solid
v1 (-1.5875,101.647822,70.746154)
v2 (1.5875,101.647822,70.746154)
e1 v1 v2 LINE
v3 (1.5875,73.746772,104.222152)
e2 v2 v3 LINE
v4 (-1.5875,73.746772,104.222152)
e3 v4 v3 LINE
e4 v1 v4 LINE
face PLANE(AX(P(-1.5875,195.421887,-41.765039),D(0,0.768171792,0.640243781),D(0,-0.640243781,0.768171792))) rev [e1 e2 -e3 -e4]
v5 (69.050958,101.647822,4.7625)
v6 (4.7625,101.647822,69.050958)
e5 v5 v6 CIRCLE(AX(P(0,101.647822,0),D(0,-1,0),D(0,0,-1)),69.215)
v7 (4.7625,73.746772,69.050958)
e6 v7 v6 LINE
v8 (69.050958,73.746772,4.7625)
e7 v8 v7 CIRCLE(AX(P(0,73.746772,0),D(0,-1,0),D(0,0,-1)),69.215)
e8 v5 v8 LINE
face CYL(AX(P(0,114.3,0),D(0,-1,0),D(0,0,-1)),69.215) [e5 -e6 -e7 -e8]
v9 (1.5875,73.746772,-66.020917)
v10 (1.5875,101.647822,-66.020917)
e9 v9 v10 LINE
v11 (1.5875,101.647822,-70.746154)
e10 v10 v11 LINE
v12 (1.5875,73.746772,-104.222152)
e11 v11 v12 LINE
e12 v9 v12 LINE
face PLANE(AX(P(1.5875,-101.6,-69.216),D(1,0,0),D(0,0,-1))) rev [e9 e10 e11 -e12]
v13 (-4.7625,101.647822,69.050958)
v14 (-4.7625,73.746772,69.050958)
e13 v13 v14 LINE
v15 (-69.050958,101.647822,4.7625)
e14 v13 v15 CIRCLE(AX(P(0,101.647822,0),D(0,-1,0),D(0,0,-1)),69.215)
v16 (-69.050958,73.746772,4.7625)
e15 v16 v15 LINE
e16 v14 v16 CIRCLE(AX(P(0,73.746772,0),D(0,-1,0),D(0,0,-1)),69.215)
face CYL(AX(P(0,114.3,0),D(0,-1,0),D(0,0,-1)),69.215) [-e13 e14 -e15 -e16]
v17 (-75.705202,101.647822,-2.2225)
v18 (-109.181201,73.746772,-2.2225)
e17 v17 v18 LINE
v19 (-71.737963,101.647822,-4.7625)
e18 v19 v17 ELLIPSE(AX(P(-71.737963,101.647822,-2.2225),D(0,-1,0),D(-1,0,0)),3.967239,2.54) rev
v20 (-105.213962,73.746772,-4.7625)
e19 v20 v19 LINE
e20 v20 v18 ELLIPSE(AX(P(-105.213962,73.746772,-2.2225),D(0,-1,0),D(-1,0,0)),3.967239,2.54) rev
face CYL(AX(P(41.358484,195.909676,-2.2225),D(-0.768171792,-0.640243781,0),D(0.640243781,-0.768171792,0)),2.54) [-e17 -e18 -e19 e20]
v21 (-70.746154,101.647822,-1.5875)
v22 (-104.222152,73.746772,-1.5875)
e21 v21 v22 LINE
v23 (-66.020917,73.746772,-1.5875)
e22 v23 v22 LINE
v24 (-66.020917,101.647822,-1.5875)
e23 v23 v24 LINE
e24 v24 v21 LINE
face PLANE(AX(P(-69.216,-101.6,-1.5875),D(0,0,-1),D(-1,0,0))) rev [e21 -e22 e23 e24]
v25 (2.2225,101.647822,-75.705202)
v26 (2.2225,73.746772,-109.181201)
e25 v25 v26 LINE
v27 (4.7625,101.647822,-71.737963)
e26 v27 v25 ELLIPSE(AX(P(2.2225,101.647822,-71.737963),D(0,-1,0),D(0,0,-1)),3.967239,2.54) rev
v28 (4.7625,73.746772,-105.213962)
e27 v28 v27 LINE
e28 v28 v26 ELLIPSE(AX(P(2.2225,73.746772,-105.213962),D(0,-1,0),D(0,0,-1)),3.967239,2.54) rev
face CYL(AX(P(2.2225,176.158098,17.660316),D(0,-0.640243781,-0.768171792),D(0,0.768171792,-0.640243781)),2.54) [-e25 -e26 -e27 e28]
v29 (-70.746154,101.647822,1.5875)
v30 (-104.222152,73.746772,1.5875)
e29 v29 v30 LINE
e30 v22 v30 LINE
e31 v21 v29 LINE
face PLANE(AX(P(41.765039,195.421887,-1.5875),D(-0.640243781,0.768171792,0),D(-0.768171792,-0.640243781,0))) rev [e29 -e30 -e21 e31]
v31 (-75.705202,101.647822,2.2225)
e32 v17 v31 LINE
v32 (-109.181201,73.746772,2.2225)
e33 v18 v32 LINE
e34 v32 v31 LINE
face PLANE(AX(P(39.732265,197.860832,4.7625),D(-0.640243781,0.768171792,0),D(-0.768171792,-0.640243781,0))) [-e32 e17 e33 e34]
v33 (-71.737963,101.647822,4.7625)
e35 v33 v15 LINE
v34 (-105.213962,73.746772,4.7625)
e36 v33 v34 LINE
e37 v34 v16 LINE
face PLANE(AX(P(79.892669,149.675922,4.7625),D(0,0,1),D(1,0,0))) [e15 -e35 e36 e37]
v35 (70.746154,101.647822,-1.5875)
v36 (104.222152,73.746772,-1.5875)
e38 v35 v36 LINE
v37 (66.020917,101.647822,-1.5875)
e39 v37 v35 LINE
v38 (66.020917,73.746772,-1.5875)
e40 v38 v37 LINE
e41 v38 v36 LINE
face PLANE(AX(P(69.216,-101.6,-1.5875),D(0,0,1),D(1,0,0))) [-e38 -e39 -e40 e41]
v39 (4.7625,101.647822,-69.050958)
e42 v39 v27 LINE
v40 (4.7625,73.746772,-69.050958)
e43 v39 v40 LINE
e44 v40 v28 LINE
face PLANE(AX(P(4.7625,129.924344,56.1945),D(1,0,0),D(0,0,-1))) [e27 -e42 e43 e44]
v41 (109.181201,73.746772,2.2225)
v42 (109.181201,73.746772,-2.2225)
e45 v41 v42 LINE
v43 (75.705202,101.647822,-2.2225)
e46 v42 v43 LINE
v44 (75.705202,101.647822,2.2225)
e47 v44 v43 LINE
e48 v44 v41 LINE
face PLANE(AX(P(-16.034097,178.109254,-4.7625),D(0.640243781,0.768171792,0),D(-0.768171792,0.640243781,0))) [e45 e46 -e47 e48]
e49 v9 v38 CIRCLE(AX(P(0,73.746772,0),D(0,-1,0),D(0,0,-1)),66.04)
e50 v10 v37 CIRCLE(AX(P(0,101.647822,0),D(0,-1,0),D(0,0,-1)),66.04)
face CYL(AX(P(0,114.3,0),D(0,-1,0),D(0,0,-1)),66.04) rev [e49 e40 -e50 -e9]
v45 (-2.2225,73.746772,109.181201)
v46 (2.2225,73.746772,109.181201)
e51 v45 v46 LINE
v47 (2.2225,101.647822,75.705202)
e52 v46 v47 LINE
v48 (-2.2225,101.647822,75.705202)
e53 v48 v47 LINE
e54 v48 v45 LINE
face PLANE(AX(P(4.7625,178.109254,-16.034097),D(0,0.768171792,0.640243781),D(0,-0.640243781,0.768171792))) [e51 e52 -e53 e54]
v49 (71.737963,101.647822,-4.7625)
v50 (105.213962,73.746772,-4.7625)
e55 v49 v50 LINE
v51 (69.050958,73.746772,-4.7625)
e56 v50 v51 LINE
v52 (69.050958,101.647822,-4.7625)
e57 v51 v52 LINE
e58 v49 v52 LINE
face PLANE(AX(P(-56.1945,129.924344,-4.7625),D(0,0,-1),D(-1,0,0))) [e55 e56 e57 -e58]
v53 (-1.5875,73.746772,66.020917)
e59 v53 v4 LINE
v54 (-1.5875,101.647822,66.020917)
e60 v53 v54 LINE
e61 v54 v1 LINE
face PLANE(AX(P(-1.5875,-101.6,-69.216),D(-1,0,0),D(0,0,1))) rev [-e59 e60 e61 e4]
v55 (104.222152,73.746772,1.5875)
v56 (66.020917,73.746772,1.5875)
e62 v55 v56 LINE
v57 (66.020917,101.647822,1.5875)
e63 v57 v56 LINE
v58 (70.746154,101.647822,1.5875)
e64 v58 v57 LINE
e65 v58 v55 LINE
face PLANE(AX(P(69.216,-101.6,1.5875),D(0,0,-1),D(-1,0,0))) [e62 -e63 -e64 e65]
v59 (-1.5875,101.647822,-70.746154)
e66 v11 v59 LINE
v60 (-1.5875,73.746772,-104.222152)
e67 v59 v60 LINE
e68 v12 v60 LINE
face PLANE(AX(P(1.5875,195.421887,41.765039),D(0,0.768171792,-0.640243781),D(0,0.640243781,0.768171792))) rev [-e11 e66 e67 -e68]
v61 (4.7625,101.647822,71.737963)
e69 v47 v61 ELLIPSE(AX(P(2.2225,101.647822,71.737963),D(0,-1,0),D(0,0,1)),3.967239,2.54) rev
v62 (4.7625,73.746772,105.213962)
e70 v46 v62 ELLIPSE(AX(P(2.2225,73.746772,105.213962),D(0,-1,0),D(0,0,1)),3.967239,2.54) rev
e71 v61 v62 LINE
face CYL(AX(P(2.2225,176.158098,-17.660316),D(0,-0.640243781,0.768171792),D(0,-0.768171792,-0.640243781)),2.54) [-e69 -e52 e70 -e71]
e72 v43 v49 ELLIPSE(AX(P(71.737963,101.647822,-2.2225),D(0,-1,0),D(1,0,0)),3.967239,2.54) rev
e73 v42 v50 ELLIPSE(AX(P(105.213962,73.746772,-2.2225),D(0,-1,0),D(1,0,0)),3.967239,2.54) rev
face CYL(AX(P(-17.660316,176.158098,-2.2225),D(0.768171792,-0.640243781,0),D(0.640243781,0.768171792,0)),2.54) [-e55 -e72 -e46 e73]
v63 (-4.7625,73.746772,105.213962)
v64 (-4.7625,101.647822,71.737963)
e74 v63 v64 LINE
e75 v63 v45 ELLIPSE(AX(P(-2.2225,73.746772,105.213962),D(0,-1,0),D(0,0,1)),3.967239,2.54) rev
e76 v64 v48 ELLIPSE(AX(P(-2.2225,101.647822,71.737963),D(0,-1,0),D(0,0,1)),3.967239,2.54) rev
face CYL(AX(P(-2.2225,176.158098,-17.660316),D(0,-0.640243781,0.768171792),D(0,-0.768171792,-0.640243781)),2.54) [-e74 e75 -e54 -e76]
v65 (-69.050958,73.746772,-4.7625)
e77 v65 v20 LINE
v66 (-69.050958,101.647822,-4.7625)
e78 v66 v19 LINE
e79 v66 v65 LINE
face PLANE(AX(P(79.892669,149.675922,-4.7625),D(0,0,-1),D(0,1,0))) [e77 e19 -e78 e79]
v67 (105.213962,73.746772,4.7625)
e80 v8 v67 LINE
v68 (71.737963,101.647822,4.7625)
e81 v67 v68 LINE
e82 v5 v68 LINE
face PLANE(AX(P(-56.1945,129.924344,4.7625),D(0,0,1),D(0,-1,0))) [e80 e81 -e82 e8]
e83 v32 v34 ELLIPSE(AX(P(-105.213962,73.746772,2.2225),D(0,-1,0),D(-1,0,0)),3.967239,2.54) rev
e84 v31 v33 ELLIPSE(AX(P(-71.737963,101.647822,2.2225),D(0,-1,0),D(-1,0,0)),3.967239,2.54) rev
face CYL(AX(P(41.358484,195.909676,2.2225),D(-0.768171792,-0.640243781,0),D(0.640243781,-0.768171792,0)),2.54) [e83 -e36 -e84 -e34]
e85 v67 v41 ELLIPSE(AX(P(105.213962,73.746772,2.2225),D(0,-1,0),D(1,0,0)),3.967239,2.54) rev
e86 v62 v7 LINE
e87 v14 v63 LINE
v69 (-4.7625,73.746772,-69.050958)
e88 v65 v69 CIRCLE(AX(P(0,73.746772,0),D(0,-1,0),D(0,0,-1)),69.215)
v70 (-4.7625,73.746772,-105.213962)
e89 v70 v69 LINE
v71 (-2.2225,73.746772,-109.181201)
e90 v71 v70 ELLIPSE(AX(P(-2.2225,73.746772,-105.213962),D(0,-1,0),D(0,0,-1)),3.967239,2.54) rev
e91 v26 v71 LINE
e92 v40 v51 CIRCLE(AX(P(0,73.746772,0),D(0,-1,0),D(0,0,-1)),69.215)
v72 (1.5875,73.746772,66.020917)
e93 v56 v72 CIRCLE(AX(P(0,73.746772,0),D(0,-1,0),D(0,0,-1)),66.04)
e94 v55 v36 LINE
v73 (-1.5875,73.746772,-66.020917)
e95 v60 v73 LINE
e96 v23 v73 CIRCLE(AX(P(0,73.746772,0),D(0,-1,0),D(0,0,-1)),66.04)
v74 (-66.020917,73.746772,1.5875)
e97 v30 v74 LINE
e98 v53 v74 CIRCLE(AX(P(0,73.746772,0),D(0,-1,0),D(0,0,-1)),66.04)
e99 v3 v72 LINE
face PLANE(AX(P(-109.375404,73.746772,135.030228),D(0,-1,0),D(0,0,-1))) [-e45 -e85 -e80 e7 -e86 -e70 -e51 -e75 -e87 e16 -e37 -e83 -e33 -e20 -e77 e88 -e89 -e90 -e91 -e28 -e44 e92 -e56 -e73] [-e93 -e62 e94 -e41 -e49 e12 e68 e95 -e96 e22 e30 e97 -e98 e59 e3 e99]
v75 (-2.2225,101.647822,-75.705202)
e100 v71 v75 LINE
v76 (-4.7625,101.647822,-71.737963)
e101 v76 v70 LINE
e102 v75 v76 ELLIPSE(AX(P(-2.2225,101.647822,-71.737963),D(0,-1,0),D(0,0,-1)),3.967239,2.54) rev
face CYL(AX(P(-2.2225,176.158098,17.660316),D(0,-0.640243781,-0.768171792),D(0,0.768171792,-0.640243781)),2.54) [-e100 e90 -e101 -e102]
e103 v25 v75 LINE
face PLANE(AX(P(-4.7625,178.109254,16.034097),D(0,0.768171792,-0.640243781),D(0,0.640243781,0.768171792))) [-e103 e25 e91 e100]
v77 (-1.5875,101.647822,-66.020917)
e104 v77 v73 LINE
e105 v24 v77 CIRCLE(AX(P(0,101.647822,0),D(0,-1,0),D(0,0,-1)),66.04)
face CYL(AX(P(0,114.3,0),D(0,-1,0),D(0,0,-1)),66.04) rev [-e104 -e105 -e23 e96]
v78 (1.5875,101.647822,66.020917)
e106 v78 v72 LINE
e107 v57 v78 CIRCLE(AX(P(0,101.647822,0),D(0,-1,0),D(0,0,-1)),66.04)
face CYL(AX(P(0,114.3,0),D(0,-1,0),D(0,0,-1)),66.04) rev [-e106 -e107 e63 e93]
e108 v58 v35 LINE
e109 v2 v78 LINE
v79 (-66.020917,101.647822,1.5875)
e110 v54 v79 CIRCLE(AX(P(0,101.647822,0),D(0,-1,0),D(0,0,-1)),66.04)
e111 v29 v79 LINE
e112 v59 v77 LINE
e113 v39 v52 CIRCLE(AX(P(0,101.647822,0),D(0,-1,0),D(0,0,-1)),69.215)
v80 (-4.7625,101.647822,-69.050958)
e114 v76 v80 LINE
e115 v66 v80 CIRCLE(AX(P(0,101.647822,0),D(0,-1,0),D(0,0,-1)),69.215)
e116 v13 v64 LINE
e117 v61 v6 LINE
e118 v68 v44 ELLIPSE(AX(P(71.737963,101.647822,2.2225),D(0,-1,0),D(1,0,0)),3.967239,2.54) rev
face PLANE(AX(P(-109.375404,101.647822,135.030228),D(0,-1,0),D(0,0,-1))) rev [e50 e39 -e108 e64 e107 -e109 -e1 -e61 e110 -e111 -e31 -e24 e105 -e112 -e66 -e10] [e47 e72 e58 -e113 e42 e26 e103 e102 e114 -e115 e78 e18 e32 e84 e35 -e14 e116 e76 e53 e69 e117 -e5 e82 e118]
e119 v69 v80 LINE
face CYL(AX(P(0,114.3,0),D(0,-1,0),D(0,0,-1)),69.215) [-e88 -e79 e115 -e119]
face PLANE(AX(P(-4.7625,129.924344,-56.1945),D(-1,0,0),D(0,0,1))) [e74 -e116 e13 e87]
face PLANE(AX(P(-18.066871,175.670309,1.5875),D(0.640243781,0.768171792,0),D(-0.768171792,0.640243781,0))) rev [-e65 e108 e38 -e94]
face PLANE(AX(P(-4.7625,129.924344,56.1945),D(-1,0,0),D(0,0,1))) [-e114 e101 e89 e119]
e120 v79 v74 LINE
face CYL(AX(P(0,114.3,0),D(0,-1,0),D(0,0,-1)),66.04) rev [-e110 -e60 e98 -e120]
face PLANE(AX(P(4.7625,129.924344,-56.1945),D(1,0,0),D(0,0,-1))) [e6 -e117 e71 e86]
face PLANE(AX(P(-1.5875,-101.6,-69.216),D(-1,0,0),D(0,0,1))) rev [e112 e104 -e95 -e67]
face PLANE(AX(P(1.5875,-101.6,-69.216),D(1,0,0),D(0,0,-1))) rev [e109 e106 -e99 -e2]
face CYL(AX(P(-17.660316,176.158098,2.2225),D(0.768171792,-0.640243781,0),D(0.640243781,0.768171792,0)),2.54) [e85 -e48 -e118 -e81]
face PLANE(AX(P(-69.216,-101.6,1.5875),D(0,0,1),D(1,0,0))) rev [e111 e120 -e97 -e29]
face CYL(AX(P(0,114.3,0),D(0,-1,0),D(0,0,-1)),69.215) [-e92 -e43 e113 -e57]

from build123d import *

# Parameters (mm, degrees)
SKETCH4_R                      = 69.215
SKETCH4_R_2                    = 66.04
BOSS_EXTRUDE3_DEPTH            = 114.3
CUT_EXTRUDE3_REACH             = 152.486
CUT_EXTRUDE3_END_RADIUS        = 69.215
SKETCH11_W                     = 3.175
SKETCH11_H                     = 203.2
CUT_EXTRUDE3_DIRECTION_2_DEPTH = 151.485622071
CUT_EXTRUDE4_REACH             = 152.486
CUT_EXTRUDE4_END_RADIUS        = 69.215
SKETCH12_W                     = 3.175
SKETCH12_H                     = 203.2
CUT_EXTRUDE5_REACH             = 152.486
CUT_EXTRUDE5_END_RADIUS        = 69.215
SKETCH13_W                     = 3.175
SKETCH13_H                     = 203.2
BOSS_EXTRUDE4_REACH            = 184.577
BOSS_EXTRUDE4_END_RADIUS       = 69.215
SKETCH17_W                     = 9.525
SKETCH17_H                     = 62.726737768
CUT_EXTRUDE6_REACH             = 184.577
CUT_EXTRUDE6_END_RADIUS        = 66.04
SKETCH19_W                     = 3.175
SKETCH19_H                     = 59.551737768
CIRPATTERN1_COUNT              = 4
FILLET2_R                      = 2.54
CUT_EXTRUDE9_DEPTH             = 193.329009636
CUT_EXTRUDE9_DEPTH_BACK        = 193.329009636
SKETCH21_W                     = 275.590003483
SKETCH21_H                     = 18.263028837
SKETCH21_H_2                   = 74.818808086


with BuildPart() as part:
    # Sketch4 → Boss-Extrude3 (new body)
    with BuildSketch(Plane(origin=(0, 0, 0), x_dir=(1, 0, 0), z_dir=(0, 1, 0))):
        with Locations(Location((0, 0, 0), (0, 0, 270))):
            Circle(SKETCH4_R)
        with Locations(Location((0, 0, 0), (0, 0, 270))):
            Circle(SKETCH4_R_2, mode=Mode.SUBTRACT)
    extrude(amount=BOSS_EXTRUDE3_DEPTH)

    # Cut-Extrude3: up to this cylinder (the profile starts inside it)
    cut_extrude3_end = Plane(origin=(0, 0, 0), z_dir=(0, -1, 0)) * Cylinder(CUT_EXTRUDE3_END_RADIUS, 444.402, mode=Mode.PRIVATE)
    # Sketch11 → Cut-Extrude3 (cut, up to the surface)
    with BuildSketch(Plane.XY, mode=Mode.PRIVATE) as cut_extrude3_sk1:
        Rectangle(SKETCH11_W, SKETCH11_H)
    cut_extrude3_tool1 = extrude(cut_extrude3_sk1.sketch, amount=-CUT_EXTRUDE3_REACH, mode=Mode.PRIVATE) & cut_extrude3_end
    add(cut_extrude3_tool1.solids().sort_by_distance((0, 0, 0))[0], mode=Mode.SUBTRACT)

    # Sketch11 → Cut-Extrude3 direction 2 (cut)
    with BuildSketch(Plane.XY):
        Rectangle(SKETCH11_W, SKETCH11_H)
    extrude(amount=CUT_EXTRUDE3_DIRECTION_2_DEPTH, mode=Mode.SUBTRACT)

    # Cut-Extrude4: up to this cylinder (the profile starts inside it)
    cut_extrude4_end = Plane(origin=(0, 0, 0), z_dir=(0, -1, 0)) * Cylinder(CUT_EXTRUDE4_END_RADIUS, 444.402, mode=Mode.PRIVATE)
    # Sketch12 → Cut-Extrude4 (cut, up to the surface)
    with BuildSketch(Plane(origin=(0, 0, 0), x_dir=(0, 0, -1), z_dir=(1, 0, 0)), mode=Mode.PRIVATE) as cut_extrude4_sk1:
        Rectangle(SKETCH12_W, SKETCH12_H)
    cut_extrude4_tool1 = extrude(cut_extrude4_sk1.sketch, amount=-CUT_EXTRUDE4_REACH, mode=Mode.PRIVATE) & cut_extrude4_end
    add(cut_extrude4_tool1.solids().sort_by_distance((0, 0, 0))[0], mode=Mode.SUBTRACT)

    # Cut-Extrude5: up to this cylinder (the profile starts inside it)
    cut_extrude5_end = Plane(origin=(0, 0, 0), z_dir=(0, -1, 0)) * Cylinder(CUT_EXTRUDE5_END_RADIUS, 444.402, mode=Mode.PRIVATE)
    # Sketch13 → Cut-Extrude5 (cut, up to the surface)
    with BuildSketch(Plane(origin=(0, 0, 0), x_dir=(0, 0, -1), z_dir=(1, 0, 0)), mode=Mode.PRIVATE) as cut_extrude5_sk1:
        Rectangle(SKETCH13_W, SKETCH13_H)
    cut_extrude5_tool1 = extrude(cut_extrude5_sk1.sketch, amount=CUT_EXTRUDE5_REACH, mode=Mode.PRIVATE) & cut_extrude5_end
    add(cut_extrude5_tool1.solids().sort_by_distance((0, 0, 0))[0], mode=Mode.SUBTRACT)

    # Boss-Extrude4: up to this cylinder (the profile starts outside it)
    boss_extrude4_end = Plane(origin=(0, 49.492455, 0), z_dir=(0, -1, 0)) * Cylinder(BOSS_EXTRUDE4_END_RADIUS, 508.584, mode=Mode.PRIVATE)
    # Sketch17 → Boss-Extrude4 (add, up to the surface)
    with BuildSketch(Plane(origin=(28.35077692, -23.629361026, 0), x_dir=(0, 0, -1), z_dir=(0.7681717916741627, -0.6402437805056029, 0)), mode=Mode.PRIVATE) as boss_extrude4_sk1:
        with Locations((0, 95.18940566)):
            Rectangle(SKETCH17_W, SKETCH17_H)
    boss_extrude4_tool1 = extrude(boss_extrude4_sk1.sketch, amount=-BOSS_EXTRUDE4_REACH, mode=Mode.PRIVATE) - boss_extrude4_end
    boss_extrude4 = boss_extrude4_tool1.solids().sort_by_distance((89.295202, 49.492455, 0))[0]
    add(boss_extrude4)

    # Cut-Extrude6: up to this cylinder (the profile starts outside it)
    cut_extrude6_end = Plane(origin=(0, 48.272983, 0), z_dir=(0, -1, 0)) * Cylinder(CUT_EXTRUDE6_END_RADIUS, 502.234, mode=Mode.PRIVATE)
    # Sketch19 → Cut-Extrude6 (cut, up to the surface)
    with BuildSketch(Plane(origin=(28.35077692, -23.629361026, 0), x_dir=(0, 0, -1), z_dir=(0.7681717916741628, -0.640243780505603, 0)), mode=Mode.PRIVATE) as cut_extrude6_sk1:
        with Locations((0, 93.60190566)):
            Rectangle(SKETCH19_W, SKETCH19_H)
    cut_extrude6_tool1 = extrude(cut_extrude6_sk1.sketch, amount=-CUT_EXTRUDE6_REACH, mode=Mode.PRIVATE) - cut_extrude6_end
    cut_extrude6 = cut_extrude6_tool1.solids().sort_by_distance((88.278815, 48.272983, 0))[0]
    add(cut_extrude6, mode=Mode.SUBTRACT)

    # CirPattern1: Boss-Extrude4, Cut-Extrude6 ×4 about axis
    cirpattern1_axis = Axis((0, 0, 0), (0, 1, 0))
    add([boss_extrude4.rotate(cirpattern1_axis, i * 360 / CIRPATTERN1_COUNT) for i in range(1, CIRPATTERN1_COUNT)])
    add([cut_extrude6.rotate(cirpattern1_axis, i * 360 / CIRPATTERN1_COUNT) for i in range(1, CIRPATTERN1_COUNT)], mode=Mode.SUBTRACT)

    # Fillet2
    # the kernel refuses this fillet: 2.54 mm, written as the material it takes off along each edge
    with BuildSketch(Plane(origin=(4.7625, 20.522109123, -65.149451994), x_dir=(-1, 0, 0), z_dir=(0, 0.7681717916741628, -0.640243780505603))) as fillet2_piece_1_section:
        with BuildLine():
            CenterArc((FILLET2_R, FILLET2_R), FILLET2_R, 180, 90)
            Line((0, FILLET2_R), (0, 0))
            Line((0, 0), (FILLET2_R, 0))
        make_face()
    fillet2_piece_1 = extrude(amount=75.426737768, mode=Mode.PRIVATE)
    fillet2_piece_1 = fillet2_piece_1 - Plane(origin=(0, 52.481761508, 0), x_dir=(0, 0, 1), z_dir=(0, -1, 0)) * Cylinder(69.215, 162, mode=Mode.PRIVATE)
    add(fillet2_piece_1, mode=Mode.SUBTRACT)
    with BuildSketch(Plane(origin=(4.7625, 69.519362531, -114.253294604), x_dir=(0, -0.7681717916741627, 0.640243780505603), z_dir=(0, 0.640243780505603, 0.7681717916741628))) as fillet2_piece_2_section:
        with BuildLine():
            CenterArc((FILLET2_R, -FILLET2_R), FILLET2_R, 90, 90)
            Line((0, -FILLET2_R), (0, 0))
            Line((0, 0), (FILLET2_R, 0))
        make_face()
    fillet2_piece_2 = extrude(amount=65.194046298, mode=Mode.PRIVATE)
    fillet2_piece_2 = fillet2_piece_2 - Plane(origin=(0, 87.751002434, 0), x_dir=(0, 0, 1), z_dir=(0, -1, 0)) * Cylinder(69.215, 141, mode=Mode.PRIVATE)
    add(fillet2_piece_2, mode=Mode.SUBTRACT)
    with BuildSketch(Plane(origin=(-4.7625, 78.462801414, -113.440951733), x_dir=(1, 0, 0), z_dir=(0, -0.7681717916741628, 0.640243780505603))) as fillet2_piece_3_section:
        with BuildLine():
            CenterArc((FILLET2_R, FILLET2_R), FILLET2_R, 180, 90)
            Line((0, FILLET2_R), (0, 0))
            Line((0, 0), (FILLET2_R, 0))
        make_face()
    fillet2_piece_3 = extrude(amount=75.426737768, mode=Mode.PRIVATE)
    fillet2_piece_3 = fillet2_piece_3 - Plane(origin=(0, 52.481717746, 0), x_dir=(0, 0, 1), z_dir=(0, -1, 0)) * Cylinder(69.215, 162, mode=Mode.PRIVATE)
    add(fillet2_piece_3, mode=Mode.SUBTRACT)
    with BuildSketch(Plane(origin=(-4.7625, 69.519362531, -114.253294604), x_dir=(1, 0, 0), z_dir=(0, 0.640243780505603, 0.7681717916741628))) as fillet2_piece_4_section:
        with BuildLine():
            CenterArc((FILLET2_R, -FILLET2_R), FILLET2_R, 90, 90)
            Line((0, -FILLET2_R), (0, 0))
            Line((0, 0), (FILLET2_R, 0))
        make_face()
    fillet2_piece_4 = extrude(amount=65.194046298, mode=Mode.PRIVATE)
    fillet2_piece_4 = fillet2_piece_4 - Plane(origin=(0, 87.75098251, 0), x_dir=(0, 0, 1), z_dir=(0, -1, 0)) * Cylinder(69.215, 141, mode=Mode.PRIVATE)
    add(fillet2_piece_4, mode=Mode.SUBTRACT)
    with BuildSketch(Plane(origin=(-113.440951733, 78.462801414, 4.7625), x_dir=(0.7681717916741627, 0.640243780505603, 0), z_dir=(0.640243780505603, -0.7681717916741628, 0))) as fillet2_piece_5_section:
        with BuildLine():
            CenterArc((FILLET2_R, -FILLET2_R), FILLET2_R, 90, 90)
            Line((0, -FILLET2_R), (0, 0))
            Line((0, 0), (FILLET2_R, 0))
        make_face()
    fillet2_piece_5 = extrude(amount=75.426737768, mode=Mode.PRIVATE)
    fillet2_piece_5 = fillet2_piece_5 - Plane(origin=(0, 52.481803849, 0), x_dir=(0, 0, 1), z_dir=(0, -1, 0)) * Cylinder(69.215, 162, mode=Mode.PRIVATE)
    add(fillet2_piece_5, mode=Mode.SUBTRACT)
    with BuildSketch(Plane(origin=(-65.149451994, 20.522109123, -4.7625), x_dir=(0.7681717916741627, 0.6402437805056029, 0), z_dir=(-0.640243780505603, 0.7681717916741628, 0))) as fillet2_piece_6_section:
        with BuildLine():
            CenterArc((FILLET2_R, -FILLET2_R), FILLET2_R, 90, 90)
            Line((0, -FILLET2_R), (0, 0))
            Line((0, 0), (FILLET2_R, 0))
        make_face()
    fillet2_piece_6 = extrude(amount=75.426737768, mode=Mode.PRIVATE)
    fillet2_piece_6 = fillet2_piece_6 - Plane(origin=(0, 52.481712427, 0), x_dir=(0, 0, 1), z_dir=(0, -1, 0)) * Cylinder(69.215, 162, mode=Mode.PRIVATE)
    add(fillet2_piece_6, mode=Mode.SUBTRACT)
    with BuildSketch(Plane(origin=(-114.253294604, 69.519362531, -4.7625), x_dir=(0.640243780505603, -0.7681717916741627, 0), z_dir=(0.7681717916741628, 0.640243780505603, 0))) as fillet2_piece_7_section:
        with BuildLine():
            CenterArc((FILLET2_R, -FILLET2_R), FILLET2_R, 90, 90)
            Line((0, -FILLET2_R), (0, 0))
            Line((0, 0), (FILLET2_R, 0))
        make_face()
    fillet2_piece_7 = extrude(amount=65.194046298, mode=Mode.PRIVATE)
    fillet2_piece_7 = fillet2_piece_7 - Plane(origin=(0, 87.75099738, 0), x_dir=(0, 0, 1), z_dir=(0, -1, 0)) * Cylinder(69.215, 141, mode=Mode.PRIVATE)
    add(fillet2_piece_7, mode=Mode.SUBTRACT)
    with BuildSketch(Plane(origin=(-114.253294604, 69.519362531, 4.7625), x_dir=(0, 0, -1), z_dir=(0.7681717916741628, 0.640243780505603, 0))) as fillet2_piece_8_section:
        with BuildLine():
            CenterArc((FILLET2_R, -FILLET2_R), FILLET2_R, 90, 90)
            Line((0, -FILLET2_R), (0, 0))
            Line((0, 0), (FILLET2_R, 0))
        make_face()
    fillet2_piece_8 = extrude(amount=65.194046298, mode=Mode.PRIVATE)
    fillet2_piece_8 = fillet2_piece_8 - Plane(origin=(0, 87.75098251, 0), x_dir=(0, 0, 1), z_dir=(0, -1, 0)) * Cylinder(69.215, 141, mode=Mode.PRIVATE)
    add(fillet2_piece_8, mode=Mode.SUBTRACT)
    with BuildSketch(Plane(origin=(4.7625, 78.462801414, 113.440951733), x_dir=(0, 0.640243780505603, -0.7681717916741628), z_dir=(0, -0.7681717916741628, -0.640243780505603))) as fillet2_piece_9_section:
        with BuildLine():
            CenterArc((FILLET2_R, -FILLET2_R), FILLET2_R, 90, 90)
            Line((0, -FILLET2_R), (0, 0))
            Line((0, 0), (FILLET2_R, 0))
        make_face()
    fillet2_piece_9 = extrude(amount=75.426737768, mode=Mode.PRIVATE)
    fillet2_piece_9 = fillet2_piece_9 - Plane(origin=(0, 52.48180385, 0), x_dir=(0, 0, 1), z_dir=(0, -1, 0)) * Cylinder(69.215, 162, mode=Mode.PRIVATE)
    add(fillet2_piece_9, mode=Mode.SUBTRACT)
    with BuildSketch(Plane(origin=(-4.7625, 20.522109123, 65.149451994), x_dir=(0, 0.640243780505603, -0.7681717916741628), z_dir=(0, 0.7681717916741628, 0.640243780505603))) as fillet2_piece_10_section:
        with BuildLine():
            CenterArc((FILLET2_R, -FILLET2_R), FILLET2_R, 90, 90)
            Line((0, -FILLET2_R), (0, 0))
            Line((0, 0), (FILLET2_R, 0))
        make_face()
    fillet2_piece_10 = extrude(amount=75.426737768, mode=Mode.PRIVATE)
    fillet2_piece_10 = fillet2_piece_10 - Plane(origin=(0, 52.481712427, 0), x_dir=(0, 0, 1), z_dir=(0, -1, 0)) * Cylinder(69.215, 162, mode=Mode.PRIVATE)
    add(fillet2_piece_10, mode=Mode.SUBTRACT)
    with BuildSketch(Plane(origin=(-4.7625, 69.519362531, 114.253294604), x_dir=(0, -0.7681717916741627, -0.640243780505603), z_dir=(0, 0.640243780505603, -0.7681717916741628))) as fillet2_piece_11_section:
        with BuildLine():
            CenterArc((FILLET2_R, -FILLET2_R), FILLET2_R, 90, 90)
            Line((0, -FILLET2_R), (0, 0))
            Line((0, 0), (FILLET2_R, 0))
        make_face()
    fillet2_piece_11 = extrude(amount=65.194046298, mode=Mode.PRIVATE)
    fillet2_piece_11 = fillet2_piece_11 - Plane(origin=(0, 87.750997379, 0), x_dir=(0, 0, 1), z_dir=(0, -1, 0)) * Cylinder(69.215, 141, mode=Mode.PRIVATE)
    add(fillet2_piece_11, mode=Mode.SUBTRACT)
    with BuildSketch(Plane(origin=(4.7625, 69.519362531, 114.253294604), x_dir=(-1, 0, 0), z_dir=(0, 0.640243780505603, -0.7681717916741628))) as fillet2_piece_12_section:
        with BuildLine():
            CenterArc((FILLET2_R, -FILLET2_R), FILLET2_R, 90, 90)
            Line((0, -FILLET2_R), (0, 0))
            Line((0, 0), (FILLET2_R, 0))
        make_face()
    fillet2_piece_12 = extrude(amount=65.194046298, mode=Mode.PRIVATE)
    fillet2_piece_12 = fillet2_piece_12 - Plane(origin=(0, 87.750982502, 0), x_dir=(0, 0, 1), z_dir=(0, -1, 0)) * Cylinder(69.215, 141, mode=Mode.PRIVATE)
    add(fillet2_piece_12, mode=Mode.SUBTRACT)
    with BuildSketch(Plane(origin=(114.253294604, 69.519362531, -4.7625), x_dir=(-0.6402437805056029, -0.7681717916741627, 0), z_dir=(-0.7681717916741628, 0.640243780505603, 0))) as fillet2_piece_13_section:
        with BuildLine():
            CenterArc((FILLET2_R, FILLET2_R), FILLET2_R, 180, 90)
            Line((0, FILLET2_R), (0, 0))
            Line((0, 0), (FILLET2_R, 0))
        make_face()
    fillet2_piece_13 = extrude(amount=65.194046298, mode=Mode.PRIVATE)
    fillet2_piece_13 = fillet2_piece_13 - Plane(origin=(0, 87.750998227, 0), x_dir=(0, 0, 1), z_dir=(0, -1, 0)) * Cylinder(69.215, 141, mode=Mode.PRIVATE)
    add(fillet2_piece_13, mode=Mode.SUBTRACT)
    with BuildSketch(Plane(origin=(114.253294604, 69.519362531, 4.7625), x_dir=(0, 0, -1), z_dir=(-0.7681717916741628, 0.640243780505603, 0))) as fillet2_piece_14_section:
        with BuildLine():
            CenterArc((FILLET2_R, FILLET2_R), FILLET2_R, 180, 90)
            Line((0, FILLET2_R), (0, 0))
            Line((0, 0), (FILLET2_R, 0))
        make_face()
    fillet2_piece_14 = extrude(amount=65.194046298, mode=Mode.PRIVATE)
    fillet2_piece_14 = fillet2_piece_14 - Plane(origin=(0, 87.7510067, 0), x_dir=(0, 0, 1), z_dir=(0, -1, 0)) * Cylinder(69.215, 141, mode=Mode.PRIVATE)
    add(fillet2_piece_14, mode=Mode.SUBTRACT)
    with BuildSketch(Plane(origin=(65.149451994, 20.522109123, 4.7625), x_dir=(-0.7681717916741627, 0.6402437805056029, 0), z_dir=(0.640243780505603, 0.7681717916741628, 0))) as fillet2_piece_15_section:
        with BuildLine():
            CenterArc((FILLET2_R, -FILLET2_R), FILLET2_R, 90, 90)
            Line((0, -FILLET2_R), (0, 0))
            Line((0, 0), (FILLET2_R, 0))
        make_face()
    fillet2_piece_15 = extrude(amount=75.426737768, mode=Mode.PRIVATE)
    fillet2_piece_15 = fillet2_piece_15 - Plane(origin=(0, 52.481781271, 0), x_dir=(0, 0, 1), z_dir=(0, -1, 0)) * Cylinder(69.215, 162, mode=Mode.PRIVATE)
    add(fillet2_piece_15, mode=Mode.SUBTRACT)
    with BuildSketch(Plane(origin=(113.440951733, 78.462801414, -4.7625), x_dir=(-0.7681717916741627, 0.640243780505603, 0), z_dir=(-0.640243780505603, -0.7681717916741628, 0))) as fillet2_piece_16_section:
        with BuildLine():
            CenterArc((FILLET2_R, -FILLET2_R), FILLET2_R, 90, 90)
            Line((0, -FILLET2_R), (0, 0))
            Line((0, 0), (FILLET2_R, 0))
        make_face()
    fillet2_piece_16 = extrude(amount=75.426737768, mode=Mode.PRIVATE)
    fillet2_piece_16 = fillet2_piece_16 - Plane(origin=(0, 52.481835587, 0), x_dir=(0, 0, 1), z_dir=(0, -1, 0)) * Cylinder(69.215, 162, mode=Mode.PRIVATE)
    add(fillet2_piece_16, mode=Mode.SUBTRACT)

    # Sketch21 → Cut-Extrude9 (cut, two sides: drawn at the far end of the back side and taken through both)
    with BuildSketch(Plane(origin=(0, 0, 0), x_dir=(0, 0, -1), z_dir=(1, 0, 0)).offset(-CUT_EXTRUDE9_DEPTH_BACK)):
        with Locations((2.764773941, 110.779336526)):
            Rectangle(SKETCH21_W, SKETCH21_H)
        with Locations((2.764773941, 36.337367755)):
            Rectangle(SKETCH21_W, SKETCH21_H_2)
    extrude(amount=CUT_EXTRUDE9_DEPTH + CUT_EXTRUDE9_DEPTH_BACK, mode=Mode.SUBTRACT)


solid = part.part
